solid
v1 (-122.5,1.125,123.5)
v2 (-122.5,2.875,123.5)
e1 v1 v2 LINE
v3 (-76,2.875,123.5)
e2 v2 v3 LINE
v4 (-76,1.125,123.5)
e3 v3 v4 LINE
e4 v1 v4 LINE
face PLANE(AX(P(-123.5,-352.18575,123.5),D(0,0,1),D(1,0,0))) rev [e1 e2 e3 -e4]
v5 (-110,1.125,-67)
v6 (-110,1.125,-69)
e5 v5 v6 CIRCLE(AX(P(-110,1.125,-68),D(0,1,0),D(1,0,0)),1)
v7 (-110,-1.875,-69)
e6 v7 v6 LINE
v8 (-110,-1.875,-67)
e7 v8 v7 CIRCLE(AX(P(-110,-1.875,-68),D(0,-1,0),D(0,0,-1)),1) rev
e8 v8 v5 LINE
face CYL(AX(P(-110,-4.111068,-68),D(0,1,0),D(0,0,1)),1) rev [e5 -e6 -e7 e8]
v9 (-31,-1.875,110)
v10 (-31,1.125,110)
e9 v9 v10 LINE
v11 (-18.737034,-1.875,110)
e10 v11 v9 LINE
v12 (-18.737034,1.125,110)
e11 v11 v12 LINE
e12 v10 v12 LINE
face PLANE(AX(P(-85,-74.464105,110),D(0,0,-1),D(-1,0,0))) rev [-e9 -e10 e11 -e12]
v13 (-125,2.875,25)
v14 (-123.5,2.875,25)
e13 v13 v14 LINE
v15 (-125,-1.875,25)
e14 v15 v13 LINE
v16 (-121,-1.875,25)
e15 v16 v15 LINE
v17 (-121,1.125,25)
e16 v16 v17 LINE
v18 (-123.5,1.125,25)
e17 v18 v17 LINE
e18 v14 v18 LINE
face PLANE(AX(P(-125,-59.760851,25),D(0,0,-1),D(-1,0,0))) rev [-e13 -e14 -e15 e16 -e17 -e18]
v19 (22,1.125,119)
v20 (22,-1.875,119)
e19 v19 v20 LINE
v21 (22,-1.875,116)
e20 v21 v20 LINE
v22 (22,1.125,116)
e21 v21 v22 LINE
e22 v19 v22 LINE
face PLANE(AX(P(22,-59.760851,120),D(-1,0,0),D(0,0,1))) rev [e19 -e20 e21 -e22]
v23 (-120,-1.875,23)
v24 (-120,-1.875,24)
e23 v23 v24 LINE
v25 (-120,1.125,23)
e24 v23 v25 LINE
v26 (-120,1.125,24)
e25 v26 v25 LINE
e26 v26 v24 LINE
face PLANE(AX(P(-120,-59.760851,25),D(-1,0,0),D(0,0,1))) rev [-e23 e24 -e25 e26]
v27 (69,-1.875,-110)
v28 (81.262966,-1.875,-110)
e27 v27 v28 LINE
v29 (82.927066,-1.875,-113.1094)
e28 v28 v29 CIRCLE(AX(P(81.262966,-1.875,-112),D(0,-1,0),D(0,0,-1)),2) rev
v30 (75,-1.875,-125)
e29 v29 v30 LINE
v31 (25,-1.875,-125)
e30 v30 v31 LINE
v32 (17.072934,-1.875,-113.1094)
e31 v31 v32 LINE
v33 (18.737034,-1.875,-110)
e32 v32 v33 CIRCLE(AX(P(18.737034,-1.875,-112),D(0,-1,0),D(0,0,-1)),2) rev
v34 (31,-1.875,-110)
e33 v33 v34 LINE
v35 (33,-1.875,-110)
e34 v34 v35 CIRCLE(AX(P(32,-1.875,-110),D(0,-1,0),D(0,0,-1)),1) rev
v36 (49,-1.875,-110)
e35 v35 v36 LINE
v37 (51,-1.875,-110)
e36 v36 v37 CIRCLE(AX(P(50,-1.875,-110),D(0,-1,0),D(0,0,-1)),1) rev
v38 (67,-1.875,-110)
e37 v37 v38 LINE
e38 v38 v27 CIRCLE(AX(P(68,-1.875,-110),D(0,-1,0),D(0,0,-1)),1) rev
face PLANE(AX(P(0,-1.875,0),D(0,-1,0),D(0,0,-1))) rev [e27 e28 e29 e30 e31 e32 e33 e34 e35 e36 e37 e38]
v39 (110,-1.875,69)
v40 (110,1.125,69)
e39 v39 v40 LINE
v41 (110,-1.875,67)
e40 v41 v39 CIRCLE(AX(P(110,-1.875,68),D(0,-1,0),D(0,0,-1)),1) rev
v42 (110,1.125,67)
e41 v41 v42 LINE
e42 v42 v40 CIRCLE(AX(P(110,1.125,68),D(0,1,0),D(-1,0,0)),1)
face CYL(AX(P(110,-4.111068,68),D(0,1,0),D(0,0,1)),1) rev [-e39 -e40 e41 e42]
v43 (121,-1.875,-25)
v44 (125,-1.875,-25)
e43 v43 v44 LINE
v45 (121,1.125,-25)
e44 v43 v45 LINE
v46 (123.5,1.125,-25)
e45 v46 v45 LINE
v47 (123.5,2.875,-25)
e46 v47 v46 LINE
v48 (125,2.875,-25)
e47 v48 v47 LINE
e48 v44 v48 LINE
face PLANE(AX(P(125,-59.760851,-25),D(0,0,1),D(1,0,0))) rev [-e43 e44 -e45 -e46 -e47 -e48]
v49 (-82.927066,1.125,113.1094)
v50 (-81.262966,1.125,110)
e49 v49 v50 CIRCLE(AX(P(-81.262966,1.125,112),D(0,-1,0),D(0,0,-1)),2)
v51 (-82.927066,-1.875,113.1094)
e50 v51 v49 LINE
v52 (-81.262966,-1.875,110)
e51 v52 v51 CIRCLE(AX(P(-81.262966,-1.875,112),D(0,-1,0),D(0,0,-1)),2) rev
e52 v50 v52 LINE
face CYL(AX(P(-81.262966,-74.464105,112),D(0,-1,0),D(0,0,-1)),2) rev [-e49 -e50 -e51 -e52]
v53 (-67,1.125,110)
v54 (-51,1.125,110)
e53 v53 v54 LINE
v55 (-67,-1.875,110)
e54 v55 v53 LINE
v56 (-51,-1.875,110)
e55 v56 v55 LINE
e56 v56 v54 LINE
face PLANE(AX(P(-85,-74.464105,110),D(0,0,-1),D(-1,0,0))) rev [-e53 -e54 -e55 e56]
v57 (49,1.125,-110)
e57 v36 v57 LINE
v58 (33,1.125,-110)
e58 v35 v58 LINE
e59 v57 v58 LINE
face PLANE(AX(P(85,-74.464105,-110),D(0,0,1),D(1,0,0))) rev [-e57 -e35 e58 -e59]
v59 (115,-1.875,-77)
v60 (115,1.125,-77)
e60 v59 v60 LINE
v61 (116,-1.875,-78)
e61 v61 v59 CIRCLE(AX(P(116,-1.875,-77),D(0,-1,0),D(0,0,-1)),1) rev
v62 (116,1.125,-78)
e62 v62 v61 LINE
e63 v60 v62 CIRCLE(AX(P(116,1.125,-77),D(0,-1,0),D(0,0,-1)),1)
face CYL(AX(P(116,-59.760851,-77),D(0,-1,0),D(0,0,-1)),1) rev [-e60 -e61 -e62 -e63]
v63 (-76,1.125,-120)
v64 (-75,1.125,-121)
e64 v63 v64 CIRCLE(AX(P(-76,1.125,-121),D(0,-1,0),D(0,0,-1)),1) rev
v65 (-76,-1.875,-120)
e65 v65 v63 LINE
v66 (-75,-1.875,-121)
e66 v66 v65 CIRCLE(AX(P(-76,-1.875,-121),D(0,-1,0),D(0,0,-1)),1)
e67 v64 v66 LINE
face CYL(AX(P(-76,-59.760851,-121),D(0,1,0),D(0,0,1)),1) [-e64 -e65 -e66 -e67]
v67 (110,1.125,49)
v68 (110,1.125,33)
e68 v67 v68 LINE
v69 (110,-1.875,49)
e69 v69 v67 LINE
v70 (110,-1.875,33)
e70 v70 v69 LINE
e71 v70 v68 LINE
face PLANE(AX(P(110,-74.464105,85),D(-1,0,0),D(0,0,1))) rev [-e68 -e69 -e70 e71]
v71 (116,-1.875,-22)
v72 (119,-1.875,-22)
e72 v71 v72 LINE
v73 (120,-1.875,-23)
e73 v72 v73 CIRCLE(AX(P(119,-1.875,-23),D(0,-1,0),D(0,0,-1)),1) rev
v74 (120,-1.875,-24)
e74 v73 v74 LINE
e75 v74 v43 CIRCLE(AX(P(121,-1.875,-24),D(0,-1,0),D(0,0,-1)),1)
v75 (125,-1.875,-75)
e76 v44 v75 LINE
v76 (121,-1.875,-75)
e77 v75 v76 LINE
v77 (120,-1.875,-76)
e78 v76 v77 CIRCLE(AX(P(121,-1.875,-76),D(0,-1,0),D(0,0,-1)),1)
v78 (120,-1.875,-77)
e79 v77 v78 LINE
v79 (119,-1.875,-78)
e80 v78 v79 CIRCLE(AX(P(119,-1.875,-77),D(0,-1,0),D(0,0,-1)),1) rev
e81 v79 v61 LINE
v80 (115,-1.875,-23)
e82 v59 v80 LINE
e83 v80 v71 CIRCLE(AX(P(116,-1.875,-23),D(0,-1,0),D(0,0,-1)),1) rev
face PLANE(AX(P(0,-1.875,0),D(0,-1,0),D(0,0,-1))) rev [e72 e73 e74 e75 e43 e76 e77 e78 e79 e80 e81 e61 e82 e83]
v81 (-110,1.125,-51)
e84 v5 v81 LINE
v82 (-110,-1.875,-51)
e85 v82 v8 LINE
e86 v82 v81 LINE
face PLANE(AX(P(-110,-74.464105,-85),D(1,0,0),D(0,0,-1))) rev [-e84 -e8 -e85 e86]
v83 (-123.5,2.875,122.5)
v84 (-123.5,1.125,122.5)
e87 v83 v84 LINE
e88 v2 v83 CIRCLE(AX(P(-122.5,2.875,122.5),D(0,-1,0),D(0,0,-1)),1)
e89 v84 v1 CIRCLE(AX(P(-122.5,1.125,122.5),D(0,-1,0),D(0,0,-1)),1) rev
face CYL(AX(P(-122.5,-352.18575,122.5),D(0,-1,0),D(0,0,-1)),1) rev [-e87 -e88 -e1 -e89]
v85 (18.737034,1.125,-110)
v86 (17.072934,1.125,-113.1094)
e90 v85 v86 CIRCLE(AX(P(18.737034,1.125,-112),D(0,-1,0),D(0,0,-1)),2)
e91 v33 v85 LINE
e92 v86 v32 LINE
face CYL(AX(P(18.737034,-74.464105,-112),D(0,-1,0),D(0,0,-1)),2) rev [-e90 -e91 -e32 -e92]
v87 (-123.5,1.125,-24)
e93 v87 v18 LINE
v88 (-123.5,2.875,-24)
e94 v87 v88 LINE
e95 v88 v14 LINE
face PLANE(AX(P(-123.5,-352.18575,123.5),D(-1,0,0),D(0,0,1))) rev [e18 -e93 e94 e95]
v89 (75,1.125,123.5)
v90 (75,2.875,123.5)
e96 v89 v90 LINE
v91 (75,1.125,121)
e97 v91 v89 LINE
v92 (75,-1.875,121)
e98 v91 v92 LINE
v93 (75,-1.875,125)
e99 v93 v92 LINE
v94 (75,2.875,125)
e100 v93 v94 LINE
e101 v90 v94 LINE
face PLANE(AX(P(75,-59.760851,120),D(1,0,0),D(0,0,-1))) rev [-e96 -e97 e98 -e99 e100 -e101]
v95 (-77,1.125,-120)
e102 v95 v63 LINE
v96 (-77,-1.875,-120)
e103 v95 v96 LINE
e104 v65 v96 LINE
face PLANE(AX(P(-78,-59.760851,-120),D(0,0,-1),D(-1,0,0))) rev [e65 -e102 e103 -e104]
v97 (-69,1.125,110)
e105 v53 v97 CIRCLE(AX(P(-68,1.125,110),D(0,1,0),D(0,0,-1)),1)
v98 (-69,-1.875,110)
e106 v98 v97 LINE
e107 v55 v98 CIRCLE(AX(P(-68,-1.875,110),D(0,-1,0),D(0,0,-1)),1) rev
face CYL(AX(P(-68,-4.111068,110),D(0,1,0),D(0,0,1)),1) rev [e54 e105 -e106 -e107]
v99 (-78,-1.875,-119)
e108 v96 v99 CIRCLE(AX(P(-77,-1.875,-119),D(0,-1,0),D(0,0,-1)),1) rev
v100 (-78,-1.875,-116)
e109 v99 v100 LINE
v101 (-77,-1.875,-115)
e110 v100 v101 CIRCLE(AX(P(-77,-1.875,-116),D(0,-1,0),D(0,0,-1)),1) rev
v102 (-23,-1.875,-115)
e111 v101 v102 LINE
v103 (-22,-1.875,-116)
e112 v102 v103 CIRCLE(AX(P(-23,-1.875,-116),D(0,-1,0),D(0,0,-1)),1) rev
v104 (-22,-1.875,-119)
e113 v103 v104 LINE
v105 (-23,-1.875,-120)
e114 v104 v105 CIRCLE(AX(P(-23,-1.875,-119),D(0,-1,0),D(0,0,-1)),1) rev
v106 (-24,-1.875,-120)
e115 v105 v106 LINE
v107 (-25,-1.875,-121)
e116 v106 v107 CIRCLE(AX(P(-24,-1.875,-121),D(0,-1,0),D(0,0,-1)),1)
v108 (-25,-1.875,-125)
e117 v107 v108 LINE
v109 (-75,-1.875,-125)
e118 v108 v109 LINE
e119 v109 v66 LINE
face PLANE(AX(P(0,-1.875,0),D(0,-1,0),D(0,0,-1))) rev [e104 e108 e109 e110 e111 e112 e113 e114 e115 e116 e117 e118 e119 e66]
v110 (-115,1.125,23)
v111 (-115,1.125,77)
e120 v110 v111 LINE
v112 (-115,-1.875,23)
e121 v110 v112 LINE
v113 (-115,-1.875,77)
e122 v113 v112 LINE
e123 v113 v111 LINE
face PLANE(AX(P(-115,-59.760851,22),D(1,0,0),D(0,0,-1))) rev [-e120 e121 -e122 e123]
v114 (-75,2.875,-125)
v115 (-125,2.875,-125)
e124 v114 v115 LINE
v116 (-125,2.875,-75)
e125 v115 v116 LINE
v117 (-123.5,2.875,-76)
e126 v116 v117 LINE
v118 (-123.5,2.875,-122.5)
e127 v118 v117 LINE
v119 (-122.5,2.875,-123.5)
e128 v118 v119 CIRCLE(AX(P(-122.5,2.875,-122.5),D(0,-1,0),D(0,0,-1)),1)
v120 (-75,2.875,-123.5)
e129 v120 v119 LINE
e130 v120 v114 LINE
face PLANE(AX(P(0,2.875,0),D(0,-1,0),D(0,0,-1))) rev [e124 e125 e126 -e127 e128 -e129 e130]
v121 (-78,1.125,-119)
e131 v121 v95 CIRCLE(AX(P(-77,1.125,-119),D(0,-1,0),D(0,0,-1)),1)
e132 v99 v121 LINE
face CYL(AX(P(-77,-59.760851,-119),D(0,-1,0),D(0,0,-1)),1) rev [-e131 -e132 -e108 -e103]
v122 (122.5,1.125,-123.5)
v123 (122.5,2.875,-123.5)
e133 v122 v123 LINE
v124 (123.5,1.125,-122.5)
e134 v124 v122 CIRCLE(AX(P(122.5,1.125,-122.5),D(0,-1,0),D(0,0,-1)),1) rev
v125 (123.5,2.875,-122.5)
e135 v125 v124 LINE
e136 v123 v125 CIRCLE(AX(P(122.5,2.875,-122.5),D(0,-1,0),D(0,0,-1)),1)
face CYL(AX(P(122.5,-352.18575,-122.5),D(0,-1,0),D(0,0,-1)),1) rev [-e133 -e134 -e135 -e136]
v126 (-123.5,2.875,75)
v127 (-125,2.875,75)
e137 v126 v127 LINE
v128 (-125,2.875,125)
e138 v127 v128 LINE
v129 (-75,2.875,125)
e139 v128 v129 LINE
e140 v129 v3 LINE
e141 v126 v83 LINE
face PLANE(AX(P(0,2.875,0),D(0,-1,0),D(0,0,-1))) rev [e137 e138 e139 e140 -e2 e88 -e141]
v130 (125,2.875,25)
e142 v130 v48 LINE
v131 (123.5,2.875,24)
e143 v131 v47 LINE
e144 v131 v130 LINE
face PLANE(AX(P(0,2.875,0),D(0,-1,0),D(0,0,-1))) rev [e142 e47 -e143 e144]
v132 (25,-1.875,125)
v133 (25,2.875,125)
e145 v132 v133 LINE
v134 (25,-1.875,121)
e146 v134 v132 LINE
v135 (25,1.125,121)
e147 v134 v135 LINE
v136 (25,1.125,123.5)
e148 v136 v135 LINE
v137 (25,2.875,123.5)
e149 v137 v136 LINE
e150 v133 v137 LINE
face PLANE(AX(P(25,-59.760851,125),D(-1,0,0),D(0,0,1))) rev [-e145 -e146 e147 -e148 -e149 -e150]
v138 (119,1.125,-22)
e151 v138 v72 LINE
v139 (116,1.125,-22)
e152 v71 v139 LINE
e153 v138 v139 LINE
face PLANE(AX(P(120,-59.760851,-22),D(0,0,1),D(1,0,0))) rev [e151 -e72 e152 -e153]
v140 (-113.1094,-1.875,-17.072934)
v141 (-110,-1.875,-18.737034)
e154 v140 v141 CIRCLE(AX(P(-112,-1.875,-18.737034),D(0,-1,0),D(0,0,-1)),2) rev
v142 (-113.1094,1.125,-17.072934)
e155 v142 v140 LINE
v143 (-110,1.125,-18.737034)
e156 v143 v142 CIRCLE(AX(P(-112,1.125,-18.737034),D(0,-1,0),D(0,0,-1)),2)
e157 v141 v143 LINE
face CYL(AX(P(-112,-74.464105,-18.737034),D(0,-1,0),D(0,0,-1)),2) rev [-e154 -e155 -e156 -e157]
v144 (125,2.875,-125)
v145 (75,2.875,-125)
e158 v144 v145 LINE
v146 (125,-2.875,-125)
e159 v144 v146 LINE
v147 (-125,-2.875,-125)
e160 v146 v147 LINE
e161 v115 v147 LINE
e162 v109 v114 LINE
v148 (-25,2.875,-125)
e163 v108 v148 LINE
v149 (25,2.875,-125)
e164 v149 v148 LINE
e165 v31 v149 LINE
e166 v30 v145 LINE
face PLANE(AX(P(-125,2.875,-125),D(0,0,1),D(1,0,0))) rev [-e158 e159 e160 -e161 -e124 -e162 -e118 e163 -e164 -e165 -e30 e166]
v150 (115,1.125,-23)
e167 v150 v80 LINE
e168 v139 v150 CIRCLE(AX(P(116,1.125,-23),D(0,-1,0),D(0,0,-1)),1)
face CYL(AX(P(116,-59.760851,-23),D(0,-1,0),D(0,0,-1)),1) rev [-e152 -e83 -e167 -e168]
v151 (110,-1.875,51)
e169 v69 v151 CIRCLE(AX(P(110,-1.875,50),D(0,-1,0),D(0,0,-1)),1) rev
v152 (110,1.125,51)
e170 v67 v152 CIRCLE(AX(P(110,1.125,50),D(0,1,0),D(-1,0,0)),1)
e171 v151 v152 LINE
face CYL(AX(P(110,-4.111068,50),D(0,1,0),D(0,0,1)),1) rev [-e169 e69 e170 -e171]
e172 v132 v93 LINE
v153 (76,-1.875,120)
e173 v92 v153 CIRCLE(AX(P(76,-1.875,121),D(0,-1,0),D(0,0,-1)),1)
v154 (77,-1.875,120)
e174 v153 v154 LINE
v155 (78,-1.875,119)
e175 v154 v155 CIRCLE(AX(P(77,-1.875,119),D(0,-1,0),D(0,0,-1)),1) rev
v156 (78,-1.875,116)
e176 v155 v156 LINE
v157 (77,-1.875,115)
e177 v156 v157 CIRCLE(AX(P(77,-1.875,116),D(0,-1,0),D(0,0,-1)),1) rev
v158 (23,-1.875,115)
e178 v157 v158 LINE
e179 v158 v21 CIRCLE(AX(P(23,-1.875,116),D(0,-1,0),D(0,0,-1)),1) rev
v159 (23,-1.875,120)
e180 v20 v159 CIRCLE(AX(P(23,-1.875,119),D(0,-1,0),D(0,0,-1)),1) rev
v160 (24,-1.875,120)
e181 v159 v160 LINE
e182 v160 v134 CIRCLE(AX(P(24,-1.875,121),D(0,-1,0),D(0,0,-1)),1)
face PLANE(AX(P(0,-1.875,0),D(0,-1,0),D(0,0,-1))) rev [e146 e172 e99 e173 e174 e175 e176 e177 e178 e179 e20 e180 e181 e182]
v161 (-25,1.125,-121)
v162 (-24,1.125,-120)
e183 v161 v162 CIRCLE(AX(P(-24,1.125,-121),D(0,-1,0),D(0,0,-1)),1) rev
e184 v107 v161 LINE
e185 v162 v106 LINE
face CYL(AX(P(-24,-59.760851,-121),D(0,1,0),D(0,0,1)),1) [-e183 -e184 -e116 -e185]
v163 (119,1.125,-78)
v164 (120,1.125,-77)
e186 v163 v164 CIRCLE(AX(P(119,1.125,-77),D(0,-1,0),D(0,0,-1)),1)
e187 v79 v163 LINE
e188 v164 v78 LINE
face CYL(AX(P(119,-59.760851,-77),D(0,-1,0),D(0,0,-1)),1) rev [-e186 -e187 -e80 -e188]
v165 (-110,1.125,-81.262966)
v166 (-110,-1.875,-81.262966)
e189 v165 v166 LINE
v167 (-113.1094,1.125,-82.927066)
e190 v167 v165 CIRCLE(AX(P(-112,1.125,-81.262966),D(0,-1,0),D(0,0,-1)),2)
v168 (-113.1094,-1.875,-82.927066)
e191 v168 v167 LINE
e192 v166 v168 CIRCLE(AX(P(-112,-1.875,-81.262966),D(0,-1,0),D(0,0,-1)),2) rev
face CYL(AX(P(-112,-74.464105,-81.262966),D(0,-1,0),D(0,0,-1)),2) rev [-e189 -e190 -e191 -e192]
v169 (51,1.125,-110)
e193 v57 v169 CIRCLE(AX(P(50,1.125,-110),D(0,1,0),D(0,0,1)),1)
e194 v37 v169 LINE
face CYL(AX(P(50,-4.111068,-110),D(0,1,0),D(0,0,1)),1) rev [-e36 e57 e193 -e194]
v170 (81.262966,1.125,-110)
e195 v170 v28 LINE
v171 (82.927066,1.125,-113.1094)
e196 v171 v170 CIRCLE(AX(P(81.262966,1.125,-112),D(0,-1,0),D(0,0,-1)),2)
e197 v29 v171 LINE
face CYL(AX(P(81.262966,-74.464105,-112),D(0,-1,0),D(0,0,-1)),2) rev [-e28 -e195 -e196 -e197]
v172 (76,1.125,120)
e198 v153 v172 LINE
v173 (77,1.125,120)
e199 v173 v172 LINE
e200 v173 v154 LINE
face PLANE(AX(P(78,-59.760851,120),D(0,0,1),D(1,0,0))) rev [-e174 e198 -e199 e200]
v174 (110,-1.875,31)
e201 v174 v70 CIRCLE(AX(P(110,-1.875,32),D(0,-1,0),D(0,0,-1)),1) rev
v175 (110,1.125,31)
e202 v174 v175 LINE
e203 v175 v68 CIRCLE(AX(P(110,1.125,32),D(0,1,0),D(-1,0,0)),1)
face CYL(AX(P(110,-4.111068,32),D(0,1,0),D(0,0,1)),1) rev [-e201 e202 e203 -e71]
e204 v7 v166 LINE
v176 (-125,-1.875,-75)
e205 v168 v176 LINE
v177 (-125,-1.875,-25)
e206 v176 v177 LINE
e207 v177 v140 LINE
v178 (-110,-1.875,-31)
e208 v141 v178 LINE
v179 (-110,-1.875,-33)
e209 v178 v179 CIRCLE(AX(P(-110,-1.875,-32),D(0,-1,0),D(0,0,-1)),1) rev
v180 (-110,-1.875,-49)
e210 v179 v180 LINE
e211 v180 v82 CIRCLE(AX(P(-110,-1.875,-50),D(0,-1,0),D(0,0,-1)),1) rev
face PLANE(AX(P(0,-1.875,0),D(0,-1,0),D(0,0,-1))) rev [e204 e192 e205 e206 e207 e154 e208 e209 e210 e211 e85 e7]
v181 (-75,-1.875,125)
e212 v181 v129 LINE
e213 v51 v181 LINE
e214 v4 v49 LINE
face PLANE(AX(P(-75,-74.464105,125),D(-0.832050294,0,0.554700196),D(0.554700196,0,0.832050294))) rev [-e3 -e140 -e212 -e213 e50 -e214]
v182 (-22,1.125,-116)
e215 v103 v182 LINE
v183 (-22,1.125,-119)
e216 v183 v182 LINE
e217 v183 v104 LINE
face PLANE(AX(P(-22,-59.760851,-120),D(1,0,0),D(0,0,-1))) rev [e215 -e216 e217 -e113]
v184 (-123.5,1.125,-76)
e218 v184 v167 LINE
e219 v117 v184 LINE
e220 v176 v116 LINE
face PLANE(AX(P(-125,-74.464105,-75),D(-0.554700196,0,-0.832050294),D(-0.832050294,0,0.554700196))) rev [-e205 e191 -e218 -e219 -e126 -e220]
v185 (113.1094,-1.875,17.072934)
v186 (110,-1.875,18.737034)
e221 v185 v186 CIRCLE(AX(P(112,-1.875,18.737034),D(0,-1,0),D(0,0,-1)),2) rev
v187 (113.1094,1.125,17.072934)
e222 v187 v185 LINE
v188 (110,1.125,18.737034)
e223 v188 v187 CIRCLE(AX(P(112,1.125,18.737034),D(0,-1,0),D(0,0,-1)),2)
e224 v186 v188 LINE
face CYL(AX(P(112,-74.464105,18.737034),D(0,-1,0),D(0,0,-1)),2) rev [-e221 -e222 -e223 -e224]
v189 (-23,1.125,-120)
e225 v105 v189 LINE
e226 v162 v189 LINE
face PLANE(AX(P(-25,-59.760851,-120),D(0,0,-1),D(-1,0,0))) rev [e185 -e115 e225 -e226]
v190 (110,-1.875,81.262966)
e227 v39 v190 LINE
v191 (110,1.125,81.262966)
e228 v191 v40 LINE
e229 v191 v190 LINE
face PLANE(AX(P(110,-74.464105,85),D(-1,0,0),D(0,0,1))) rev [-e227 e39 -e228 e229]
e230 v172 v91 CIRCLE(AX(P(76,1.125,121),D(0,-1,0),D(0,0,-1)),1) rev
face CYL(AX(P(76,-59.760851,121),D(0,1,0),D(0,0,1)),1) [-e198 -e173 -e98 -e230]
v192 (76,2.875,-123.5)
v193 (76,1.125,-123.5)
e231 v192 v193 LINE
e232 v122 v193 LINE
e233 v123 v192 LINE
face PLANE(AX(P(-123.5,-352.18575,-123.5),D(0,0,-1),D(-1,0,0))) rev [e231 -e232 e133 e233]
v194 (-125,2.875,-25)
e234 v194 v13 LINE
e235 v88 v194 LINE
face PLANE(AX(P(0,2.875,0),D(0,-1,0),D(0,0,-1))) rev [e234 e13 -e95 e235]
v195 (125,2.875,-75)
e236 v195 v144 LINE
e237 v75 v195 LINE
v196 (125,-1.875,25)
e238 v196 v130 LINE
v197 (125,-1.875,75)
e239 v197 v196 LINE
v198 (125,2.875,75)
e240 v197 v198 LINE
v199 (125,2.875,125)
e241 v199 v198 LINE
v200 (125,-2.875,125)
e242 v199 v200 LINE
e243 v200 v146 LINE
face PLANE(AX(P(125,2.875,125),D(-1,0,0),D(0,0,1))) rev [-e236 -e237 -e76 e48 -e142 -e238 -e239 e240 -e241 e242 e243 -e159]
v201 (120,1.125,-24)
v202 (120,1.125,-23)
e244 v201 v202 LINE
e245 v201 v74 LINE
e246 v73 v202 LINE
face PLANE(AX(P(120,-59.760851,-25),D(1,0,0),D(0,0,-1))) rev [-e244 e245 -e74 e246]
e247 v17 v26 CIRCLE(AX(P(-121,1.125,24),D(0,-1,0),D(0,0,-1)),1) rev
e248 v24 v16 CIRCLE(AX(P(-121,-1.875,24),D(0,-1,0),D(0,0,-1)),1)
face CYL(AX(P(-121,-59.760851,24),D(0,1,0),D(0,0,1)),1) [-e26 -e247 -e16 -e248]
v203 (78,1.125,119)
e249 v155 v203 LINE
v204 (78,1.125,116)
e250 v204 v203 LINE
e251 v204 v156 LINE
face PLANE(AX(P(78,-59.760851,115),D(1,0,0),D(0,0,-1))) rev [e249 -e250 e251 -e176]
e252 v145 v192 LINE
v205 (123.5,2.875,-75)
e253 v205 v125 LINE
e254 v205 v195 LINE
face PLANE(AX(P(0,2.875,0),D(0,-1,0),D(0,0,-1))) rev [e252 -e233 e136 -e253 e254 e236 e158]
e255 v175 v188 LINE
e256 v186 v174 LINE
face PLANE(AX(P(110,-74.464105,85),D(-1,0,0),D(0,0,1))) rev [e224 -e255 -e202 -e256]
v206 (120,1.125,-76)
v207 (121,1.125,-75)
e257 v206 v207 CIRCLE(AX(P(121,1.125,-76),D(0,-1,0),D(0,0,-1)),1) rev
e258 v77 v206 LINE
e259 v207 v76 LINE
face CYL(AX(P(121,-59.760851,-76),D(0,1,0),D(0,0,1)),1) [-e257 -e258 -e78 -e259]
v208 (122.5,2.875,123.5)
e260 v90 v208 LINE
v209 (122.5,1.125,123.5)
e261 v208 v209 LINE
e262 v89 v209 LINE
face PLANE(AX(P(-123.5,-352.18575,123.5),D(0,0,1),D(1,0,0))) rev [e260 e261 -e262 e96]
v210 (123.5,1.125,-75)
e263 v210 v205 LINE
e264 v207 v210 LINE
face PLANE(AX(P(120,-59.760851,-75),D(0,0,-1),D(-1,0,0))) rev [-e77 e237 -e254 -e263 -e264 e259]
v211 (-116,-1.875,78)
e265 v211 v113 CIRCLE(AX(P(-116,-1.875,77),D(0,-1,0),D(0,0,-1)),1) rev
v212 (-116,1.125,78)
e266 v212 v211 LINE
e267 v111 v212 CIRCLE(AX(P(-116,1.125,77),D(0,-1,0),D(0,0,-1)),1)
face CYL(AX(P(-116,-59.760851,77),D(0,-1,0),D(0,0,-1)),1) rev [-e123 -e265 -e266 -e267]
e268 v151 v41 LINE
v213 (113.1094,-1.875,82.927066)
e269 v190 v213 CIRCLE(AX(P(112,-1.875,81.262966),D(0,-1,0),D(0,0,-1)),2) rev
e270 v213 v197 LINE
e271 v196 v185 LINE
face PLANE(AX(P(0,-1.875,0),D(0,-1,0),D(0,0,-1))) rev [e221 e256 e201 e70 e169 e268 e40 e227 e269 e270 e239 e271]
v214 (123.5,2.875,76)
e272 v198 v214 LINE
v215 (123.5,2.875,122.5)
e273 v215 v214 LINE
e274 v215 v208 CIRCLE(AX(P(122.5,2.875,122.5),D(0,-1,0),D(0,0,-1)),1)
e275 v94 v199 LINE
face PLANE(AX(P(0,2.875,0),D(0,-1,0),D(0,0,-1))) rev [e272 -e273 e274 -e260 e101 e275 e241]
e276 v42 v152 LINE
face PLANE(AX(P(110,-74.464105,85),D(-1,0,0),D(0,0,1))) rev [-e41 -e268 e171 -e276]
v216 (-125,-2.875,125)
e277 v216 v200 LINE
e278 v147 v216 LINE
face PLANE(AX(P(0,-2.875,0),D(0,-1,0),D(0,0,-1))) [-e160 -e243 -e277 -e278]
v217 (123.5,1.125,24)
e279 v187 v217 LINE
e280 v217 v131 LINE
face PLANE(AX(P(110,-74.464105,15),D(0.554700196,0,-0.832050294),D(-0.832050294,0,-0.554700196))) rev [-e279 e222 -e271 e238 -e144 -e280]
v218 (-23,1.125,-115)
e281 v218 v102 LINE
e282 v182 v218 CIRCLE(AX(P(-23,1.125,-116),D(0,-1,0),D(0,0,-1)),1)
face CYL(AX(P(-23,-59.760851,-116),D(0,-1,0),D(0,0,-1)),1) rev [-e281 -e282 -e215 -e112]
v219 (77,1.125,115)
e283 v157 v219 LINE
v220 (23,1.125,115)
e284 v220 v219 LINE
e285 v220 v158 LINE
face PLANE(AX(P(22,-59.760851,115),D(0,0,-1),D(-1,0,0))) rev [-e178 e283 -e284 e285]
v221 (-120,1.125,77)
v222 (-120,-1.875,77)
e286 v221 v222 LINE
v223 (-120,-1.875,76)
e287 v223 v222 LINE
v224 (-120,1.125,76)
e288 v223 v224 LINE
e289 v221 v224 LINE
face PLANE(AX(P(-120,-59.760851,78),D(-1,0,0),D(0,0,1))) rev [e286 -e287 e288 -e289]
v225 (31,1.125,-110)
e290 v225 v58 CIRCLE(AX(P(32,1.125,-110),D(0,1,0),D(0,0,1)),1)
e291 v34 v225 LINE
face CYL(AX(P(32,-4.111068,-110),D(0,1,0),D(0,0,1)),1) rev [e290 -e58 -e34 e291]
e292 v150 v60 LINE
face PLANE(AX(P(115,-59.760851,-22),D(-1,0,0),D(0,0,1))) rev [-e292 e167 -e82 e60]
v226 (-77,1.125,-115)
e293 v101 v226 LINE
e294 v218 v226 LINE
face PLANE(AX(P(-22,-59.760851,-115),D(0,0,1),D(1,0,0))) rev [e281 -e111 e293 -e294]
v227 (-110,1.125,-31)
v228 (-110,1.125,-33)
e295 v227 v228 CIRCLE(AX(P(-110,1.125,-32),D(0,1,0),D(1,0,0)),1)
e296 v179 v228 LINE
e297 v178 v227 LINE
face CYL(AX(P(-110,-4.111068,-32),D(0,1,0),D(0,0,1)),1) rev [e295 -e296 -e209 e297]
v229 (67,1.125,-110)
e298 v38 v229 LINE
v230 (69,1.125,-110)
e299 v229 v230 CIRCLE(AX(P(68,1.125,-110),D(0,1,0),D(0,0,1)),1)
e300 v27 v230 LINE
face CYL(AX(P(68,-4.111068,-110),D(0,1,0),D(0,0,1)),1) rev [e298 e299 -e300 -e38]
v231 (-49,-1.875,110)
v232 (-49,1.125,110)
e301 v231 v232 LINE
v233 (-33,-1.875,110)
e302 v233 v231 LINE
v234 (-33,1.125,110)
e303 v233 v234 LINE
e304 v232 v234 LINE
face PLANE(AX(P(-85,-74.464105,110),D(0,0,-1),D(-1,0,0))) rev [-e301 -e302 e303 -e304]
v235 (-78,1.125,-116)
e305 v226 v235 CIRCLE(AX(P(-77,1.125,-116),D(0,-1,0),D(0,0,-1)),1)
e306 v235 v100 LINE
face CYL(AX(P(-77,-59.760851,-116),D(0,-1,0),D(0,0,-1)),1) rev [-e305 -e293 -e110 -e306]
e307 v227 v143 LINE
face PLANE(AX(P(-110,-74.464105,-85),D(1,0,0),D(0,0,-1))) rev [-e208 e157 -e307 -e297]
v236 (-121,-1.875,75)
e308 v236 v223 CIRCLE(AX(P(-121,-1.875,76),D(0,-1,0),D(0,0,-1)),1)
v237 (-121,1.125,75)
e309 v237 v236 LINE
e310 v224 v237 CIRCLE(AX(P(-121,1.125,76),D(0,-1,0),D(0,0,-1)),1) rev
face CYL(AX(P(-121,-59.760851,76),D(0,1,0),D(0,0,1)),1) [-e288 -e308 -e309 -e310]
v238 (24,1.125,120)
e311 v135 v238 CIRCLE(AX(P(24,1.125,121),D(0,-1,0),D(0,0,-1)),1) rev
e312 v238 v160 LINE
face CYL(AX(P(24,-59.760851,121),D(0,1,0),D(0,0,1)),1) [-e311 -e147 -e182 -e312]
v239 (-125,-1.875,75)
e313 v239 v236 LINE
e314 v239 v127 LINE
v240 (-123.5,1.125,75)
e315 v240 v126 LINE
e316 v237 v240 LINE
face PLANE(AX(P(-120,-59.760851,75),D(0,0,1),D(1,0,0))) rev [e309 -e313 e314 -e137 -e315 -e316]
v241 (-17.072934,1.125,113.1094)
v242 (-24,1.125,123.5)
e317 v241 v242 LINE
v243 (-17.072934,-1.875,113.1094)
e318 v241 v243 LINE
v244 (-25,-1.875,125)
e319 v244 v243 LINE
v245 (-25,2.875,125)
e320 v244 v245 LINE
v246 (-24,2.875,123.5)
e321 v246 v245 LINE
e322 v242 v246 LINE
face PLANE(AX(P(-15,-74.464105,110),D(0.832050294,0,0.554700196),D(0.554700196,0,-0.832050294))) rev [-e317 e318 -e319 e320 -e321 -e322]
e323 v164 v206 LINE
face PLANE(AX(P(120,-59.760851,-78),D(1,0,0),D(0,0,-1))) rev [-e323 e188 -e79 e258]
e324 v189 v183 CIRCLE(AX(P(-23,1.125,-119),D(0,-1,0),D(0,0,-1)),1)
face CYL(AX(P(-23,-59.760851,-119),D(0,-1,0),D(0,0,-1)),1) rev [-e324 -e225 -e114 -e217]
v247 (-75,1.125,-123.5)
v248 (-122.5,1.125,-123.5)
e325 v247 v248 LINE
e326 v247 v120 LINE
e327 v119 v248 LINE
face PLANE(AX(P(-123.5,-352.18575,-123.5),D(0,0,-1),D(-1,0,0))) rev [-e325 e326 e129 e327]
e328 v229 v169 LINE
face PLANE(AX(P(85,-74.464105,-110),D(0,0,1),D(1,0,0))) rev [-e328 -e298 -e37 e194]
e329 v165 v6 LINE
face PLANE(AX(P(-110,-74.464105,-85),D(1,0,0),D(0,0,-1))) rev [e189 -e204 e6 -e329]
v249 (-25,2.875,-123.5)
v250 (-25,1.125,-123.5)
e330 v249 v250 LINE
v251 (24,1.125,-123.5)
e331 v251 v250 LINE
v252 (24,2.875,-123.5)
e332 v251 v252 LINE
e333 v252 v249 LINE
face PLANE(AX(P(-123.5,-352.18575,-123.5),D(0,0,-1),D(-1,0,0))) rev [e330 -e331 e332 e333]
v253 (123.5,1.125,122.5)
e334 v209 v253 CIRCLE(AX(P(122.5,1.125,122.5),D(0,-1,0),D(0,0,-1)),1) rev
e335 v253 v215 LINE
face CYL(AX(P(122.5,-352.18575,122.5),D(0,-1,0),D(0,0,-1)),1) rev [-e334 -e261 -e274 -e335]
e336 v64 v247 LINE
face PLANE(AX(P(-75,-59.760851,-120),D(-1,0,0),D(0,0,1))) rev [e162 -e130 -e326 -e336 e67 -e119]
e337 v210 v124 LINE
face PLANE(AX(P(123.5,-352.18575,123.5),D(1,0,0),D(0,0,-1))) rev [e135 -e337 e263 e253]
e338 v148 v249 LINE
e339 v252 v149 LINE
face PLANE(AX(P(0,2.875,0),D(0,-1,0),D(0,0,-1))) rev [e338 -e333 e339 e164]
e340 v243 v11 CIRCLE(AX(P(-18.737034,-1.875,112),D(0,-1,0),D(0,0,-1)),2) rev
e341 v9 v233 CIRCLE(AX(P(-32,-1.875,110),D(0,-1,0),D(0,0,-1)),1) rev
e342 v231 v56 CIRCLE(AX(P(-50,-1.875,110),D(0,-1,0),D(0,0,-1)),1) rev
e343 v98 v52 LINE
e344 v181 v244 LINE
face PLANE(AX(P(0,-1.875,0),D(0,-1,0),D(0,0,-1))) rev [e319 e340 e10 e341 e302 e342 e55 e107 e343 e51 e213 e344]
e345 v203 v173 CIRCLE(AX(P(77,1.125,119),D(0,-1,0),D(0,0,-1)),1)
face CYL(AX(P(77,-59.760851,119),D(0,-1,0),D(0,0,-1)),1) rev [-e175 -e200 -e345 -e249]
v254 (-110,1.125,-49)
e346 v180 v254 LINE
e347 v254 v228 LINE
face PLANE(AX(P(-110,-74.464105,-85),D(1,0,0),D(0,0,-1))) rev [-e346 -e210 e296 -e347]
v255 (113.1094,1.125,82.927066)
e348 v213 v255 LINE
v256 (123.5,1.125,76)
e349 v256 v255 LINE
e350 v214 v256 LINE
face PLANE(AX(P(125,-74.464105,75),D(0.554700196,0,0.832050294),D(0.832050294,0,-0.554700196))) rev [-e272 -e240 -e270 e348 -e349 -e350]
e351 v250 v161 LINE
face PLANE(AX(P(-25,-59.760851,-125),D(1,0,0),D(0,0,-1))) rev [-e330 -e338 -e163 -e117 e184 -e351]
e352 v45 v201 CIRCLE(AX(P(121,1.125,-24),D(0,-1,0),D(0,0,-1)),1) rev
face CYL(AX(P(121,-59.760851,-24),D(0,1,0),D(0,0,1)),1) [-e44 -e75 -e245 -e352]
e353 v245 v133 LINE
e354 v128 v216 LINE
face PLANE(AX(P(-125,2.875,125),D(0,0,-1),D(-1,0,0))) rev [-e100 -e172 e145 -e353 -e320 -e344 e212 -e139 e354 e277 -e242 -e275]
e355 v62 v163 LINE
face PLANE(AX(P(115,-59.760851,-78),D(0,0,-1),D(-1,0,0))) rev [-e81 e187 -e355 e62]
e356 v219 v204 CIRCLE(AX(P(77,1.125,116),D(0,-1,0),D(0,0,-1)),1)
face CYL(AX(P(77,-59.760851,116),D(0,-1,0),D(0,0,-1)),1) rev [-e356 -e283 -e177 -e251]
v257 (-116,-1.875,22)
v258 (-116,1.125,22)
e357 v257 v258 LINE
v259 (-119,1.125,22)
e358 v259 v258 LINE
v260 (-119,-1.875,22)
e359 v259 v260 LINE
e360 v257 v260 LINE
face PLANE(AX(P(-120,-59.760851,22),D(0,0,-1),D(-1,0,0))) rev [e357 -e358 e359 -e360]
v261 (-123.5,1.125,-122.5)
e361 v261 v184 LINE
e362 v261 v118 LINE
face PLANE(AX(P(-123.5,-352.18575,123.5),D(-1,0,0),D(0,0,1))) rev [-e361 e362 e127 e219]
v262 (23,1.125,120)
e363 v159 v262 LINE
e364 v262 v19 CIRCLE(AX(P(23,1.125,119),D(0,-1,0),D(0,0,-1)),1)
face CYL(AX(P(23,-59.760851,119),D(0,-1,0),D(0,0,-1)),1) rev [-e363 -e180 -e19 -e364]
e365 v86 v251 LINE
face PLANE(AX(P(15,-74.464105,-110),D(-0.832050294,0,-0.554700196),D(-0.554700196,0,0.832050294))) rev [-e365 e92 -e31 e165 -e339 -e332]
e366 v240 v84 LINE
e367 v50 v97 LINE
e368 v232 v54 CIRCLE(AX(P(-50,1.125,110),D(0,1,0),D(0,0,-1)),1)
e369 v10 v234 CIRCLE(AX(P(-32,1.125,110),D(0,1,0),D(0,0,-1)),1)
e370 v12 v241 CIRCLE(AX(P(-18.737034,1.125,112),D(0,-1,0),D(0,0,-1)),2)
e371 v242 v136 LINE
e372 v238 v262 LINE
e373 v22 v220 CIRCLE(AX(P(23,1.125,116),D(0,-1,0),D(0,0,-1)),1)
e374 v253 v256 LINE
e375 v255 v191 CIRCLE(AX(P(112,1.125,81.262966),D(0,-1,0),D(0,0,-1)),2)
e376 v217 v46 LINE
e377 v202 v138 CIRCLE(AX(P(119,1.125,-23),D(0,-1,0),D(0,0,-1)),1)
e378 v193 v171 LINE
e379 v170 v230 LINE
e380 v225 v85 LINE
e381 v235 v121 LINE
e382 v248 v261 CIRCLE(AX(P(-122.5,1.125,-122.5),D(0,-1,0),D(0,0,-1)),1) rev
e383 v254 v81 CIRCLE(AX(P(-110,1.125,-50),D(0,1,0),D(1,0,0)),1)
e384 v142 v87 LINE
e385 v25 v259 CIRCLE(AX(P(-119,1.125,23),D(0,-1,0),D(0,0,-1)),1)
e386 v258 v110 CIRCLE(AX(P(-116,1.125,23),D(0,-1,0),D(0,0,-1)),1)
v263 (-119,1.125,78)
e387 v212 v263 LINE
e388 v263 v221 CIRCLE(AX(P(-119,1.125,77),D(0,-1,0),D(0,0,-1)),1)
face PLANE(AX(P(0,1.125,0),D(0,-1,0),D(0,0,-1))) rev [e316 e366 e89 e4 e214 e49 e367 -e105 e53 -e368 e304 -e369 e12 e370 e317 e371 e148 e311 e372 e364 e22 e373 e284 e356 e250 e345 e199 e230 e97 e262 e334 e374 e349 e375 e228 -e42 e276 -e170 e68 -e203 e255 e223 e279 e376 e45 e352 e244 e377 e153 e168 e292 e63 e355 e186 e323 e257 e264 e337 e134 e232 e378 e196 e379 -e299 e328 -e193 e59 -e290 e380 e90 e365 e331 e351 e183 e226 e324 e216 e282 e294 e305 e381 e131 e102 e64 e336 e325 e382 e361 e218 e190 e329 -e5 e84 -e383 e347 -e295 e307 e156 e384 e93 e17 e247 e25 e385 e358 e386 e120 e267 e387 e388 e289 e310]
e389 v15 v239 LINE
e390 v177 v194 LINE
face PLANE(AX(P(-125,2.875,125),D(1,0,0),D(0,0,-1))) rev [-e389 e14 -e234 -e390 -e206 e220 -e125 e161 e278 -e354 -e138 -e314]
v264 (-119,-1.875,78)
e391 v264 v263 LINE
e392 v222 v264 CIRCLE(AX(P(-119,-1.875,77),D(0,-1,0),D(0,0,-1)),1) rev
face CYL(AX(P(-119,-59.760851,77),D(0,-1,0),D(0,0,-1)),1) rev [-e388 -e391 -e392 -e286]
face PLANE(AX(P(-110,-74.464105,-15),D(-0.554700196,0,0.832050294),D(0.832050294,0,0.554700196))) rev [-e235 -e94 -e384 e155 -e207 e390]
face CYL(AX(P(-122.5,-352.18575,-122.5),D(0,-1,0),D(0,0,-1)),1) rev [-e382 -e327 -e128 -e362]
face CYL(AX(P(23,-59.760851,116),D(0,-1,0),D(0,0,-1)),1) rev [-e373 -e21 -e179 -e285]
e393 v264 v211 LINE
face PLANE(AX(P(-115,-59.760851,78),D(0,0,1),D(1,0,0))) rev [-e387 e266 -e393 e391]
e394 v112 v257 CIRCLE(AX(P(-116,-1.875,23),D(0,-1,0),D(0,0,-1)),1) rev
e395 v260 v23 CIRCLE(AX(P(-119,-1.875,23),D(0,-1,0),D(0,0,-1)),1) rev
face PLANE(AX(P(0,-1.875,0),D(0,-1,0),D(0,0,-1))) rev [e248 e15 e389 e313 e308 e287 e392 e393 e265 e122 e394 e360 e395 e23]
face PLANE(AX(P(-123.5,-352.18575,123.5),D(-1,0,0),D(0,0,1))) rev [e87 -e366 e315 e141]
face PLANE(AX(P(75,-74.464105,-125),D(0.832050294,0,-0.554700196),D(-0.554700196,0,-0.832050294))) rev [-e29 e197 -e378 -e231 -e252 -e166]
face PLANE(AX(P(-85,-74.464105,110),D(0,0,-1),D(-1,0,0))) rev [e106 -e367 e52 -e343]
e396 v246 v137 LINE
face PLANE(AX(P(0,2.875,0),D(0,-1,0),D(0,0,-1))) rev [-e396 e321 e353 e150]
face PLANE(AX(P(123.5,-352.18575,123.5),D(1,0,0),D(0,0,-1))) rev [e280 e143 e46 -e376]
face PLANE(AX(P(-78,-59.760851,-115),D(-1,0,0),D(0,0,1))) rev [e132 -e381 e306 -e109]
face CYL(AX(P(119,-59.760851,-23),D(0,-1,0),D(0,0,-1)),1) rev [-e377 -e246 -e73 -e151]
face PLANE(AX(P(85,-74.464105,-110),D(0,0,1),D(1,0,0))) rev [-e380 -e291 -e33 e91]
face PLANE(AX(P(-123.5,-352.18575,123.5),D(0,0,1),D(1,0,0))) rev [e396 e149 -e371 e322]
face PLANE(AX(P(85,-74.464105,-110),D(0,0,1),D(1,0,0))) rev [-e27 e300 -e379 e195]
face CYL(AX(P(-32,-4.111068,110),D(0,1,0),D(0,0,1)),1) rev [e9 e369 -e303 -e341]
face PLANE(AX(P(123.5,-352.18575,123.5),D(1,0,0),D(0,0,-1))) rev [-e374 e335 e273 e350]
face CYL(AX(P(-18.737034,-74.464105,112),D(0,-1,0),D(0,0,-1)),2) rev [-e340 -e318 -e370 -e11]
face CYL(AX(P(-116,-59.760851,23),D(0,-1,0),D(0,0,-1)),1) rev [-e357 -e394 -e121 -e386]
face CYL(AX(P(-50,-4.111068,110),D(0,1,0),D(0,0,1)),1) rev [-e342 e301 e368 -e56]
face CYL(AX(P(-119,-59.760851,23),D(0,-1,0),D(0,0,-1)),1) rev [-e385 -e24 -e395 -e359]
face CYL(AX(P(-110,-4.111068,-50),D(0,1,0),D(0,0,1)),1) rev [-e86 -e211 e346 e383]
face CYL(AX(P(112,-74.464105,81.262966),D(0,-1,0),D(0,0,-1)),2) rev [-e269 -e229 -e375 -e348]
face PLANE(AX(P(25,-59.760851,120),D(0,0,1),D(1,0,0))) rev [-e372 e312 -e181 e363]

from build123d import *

# Parameters (mm, degrees)
SKETCH1_W           = 250
SKETCH1_H           = 250
BOSS_EXTRUDE1_DEPTH = 2.875
SKETCH2_W           = 247
SKETCH2_H           = 247
CUT_EXTRUDE1_DEPTH  = 1.75
CUT_EXTRUDE2_START  = -4.75
CUT_EXTRUDE2_DEPTH  = 182.620185447
CUT_EXTRUDE4_DEPTH  = 3
CUT_EXTRUDE3_START  = -4.75
CUT_EXTRUDE3_DEPTH  = 182.620185447
FILLET2_R           = 1
FILLET3_R           = 2
CIRPATTERN1_START   = -1.875
CIRPATTERN1_DEPTH   = 4.75


# Read off the part's stored shape, not the designer's step: CirPattern1
with BuildPart() as part:
    # Sketch1 → Boss-Extrude1 (new, symmetric)
    with BuildSketch(Plane(origin=(0, 0, 0), x_dir=(1, 0, 0), z_dir=(0, 1, 0))):
        Rectangle(SKETCH1_W, SKETCH1_H)
    extrude(amount=BOSS_EXTRUDE1_DEPTH, both=True)

    # Sketch2 → Cut-Extrude1 (cut)
    with BuildSketch(Plane(origin=(0, 2.875, 0), x_dir=(1, 0, 0), z_dir=(0, 1, 0))):
        Rectangle(SKETCH2_W, SKETCH2_H)
    extrude(amount=-CUT_EXTRUDE1_DEPTH, mode=Mode.SUBTRACT)

    # Sketch4 → Cut-Extrude2 (cut)
    with BuildSketch(Plane(origin=(0, 2.875, 0), x_dir=(1, 0, 0), z_dir=(0, 1, 0)).offset(CUT_EXTRUDE2_START)):
        Polygon((-75, -125), (-85, -110), (-15, -110), (-25, -125), align=None)
    extrude(amount=CUT_EXTRUDE2_DEPTH, mode=Mode.SUBTRACT)

    # Sketch6 → Cut-Extrude4 (cut)
    with BuildSketch(Plane(origin=(0, 1.125, 0), x_dir=(1, 0, 0), z_dir=(0, 1, 0))):
        with BuildLine():
            Line((-69, -110), (-67, -110))
            ThreePointArc((-67, -110), (-68, -109), (-69, -110))
        make_face()
        with BuildLine():
            Line((-51, -110), (-49, -110))
            ThreePointArc((-49, -110), (-50, -109), (-51, -110))
        make_face()
        with BuildLine():
            Line((-33, -110), (-31, -110))
            ThreePointArc((-31, -110), (-32, -109), (-33, -110))
        make_face()
    extrude(amount=-CUT_EXTRUDE4_DEPTH, mode=Mode.SUBTRACT)

    # Sketch5 → Cut-Extrude3 (cut)
    with BuildSketch(Plane(origin=(0, 2.875, 0), x_dir=(1, 0, 0), z_dir=(0, 1, 0)).offset(CUT_EXTRUDE3_START)):
        Polygon((25, -125), (25, -120), (22, -120), (22, -115), (78, -115), (78, -120), (75, -120), (75, -125), align=None)
    extrude(amount=CUT_EXTRUDE3_DEPTH, mode=Mode.SUBTRACT)

    # Fillet2
    fillet2_edges = [part.edges().sort_by_distance(p)[0] for p in [
        (-123.5, 2, -123.5),
        (-123.5, 2, 123.5),
        (123.5, 2, 123.5),
        (123.5, 2, -123.5),
        (75, -0.375, 120),
        (78, -0.375, 120),
        (78, -0.375, 115),
        (22, -0.375, 115),
        (22, -0.375, 120),
        (25, -0.375, 120),
    ]]
    fillet(fillet2_edges, radius=FILLET2_R)

    # Fillet3
    fillet3_edges = [part.edges().sort_by_distance(p)[0] for p in [
        (-85, -0.375, 110),
        (-15, -0.375, 110),
    ]]
    fillet(fillet3_edges, radius=FILLET3_R)

    # CirPattern1 outline → CirPattern1 (cut)
    with BuildSketch(Plane(origin=(0, 0, 0), x_dir=(1, 0, 0), z_dir=(0, 1, 0)).offset(CIRPATTERN1_START)):
        with BuildLine():
            ThreePointArc((110, -31), (109, -32), (110, -33))
            Line((110, -33), (110, -49))
            ThreePointArc((110, -49), (109, -50), (110, -51))
            Line((110, -51), (110, -67))
            ThreePointArc((110, -67), (109, -68), (110, -69))
            Line((110, -69), (110, -81.262965816))
            ThreePointArc((110, -81.262965816), (111.056284149, -83.026315014), (113.109400392, -82.927066405))
            Line((113.109400392, -82.927066405), (125, -75))
            Line((125, -75), (125, -25))
            Line((125, -25), (113.109400392, -17.072933595))
            ThreePointArc((113.109400392, -17.072933595), (111.056284149, -16.973684986), (110, -18.737034184))
            Line((110, -18.737034184), (110, -31))
        make_face()
        with BuildLine():
            Line((-125, 75), (-125, 25))
            Line((-125, 25), (-113.109400392, 17.072933595))
            ThreePointArc((-113.109400392, 17.072933595), (-111.056284149, 16.973684986), (-110, 18.737034184))
            Line((-110, 18.737034184), (-110, 31))
            ThreePointArc((-110, 31), (-109, 32), (-110, 33))
            Line((-110, 33), (-110, 49))
            ThreePointArc((-110, 49), (-109, 50), (-110, 51))
            Line((-110, 51), (-110, 67))
            ThreePointArc((-110, 67), (-109, 68), (-110, 69))
            Line((-110, 69), (-110, 81.262965816))
            ThreePointArc((-110, 81.262965816), (-111.056284149, 83.026315014), (-113.109400392, 82.927066405))
            Line((-113.109400392, 82.927066405), (-125, 75))
        make_face()
        with BuildLine():
            Line((75, 125), (25, 125))
            Line((25, 125), (17.072933595, 113.109400392))
            ThreePointArc((17.072933595, 113.109400392), (16.973684986, 111.056284149), (18.737034184, 110))
            Line((18.737034184, 110), (31, 110))
            ThreePointArc((31, 110), (32, 109), (33, 110))
            Line((33, 110), (49, 110))
            ThreePointArc((49, 110), (50, 109), (51, 110))
            Line((51, 110), (67, 110))
            ThreePointArc((67, 110), (68, 109), (69, 110))
            Line((69, 110), (81.262965816, 110))
            ThreePointArc((81.262965816, 110), (83.026315014, 111.056284149), (82.927066405, 113.109400392))
            Line((82.927066405, 113.109400392), (75, 125))
        make_face()
        with BuildLine():
            Line((125, 75), (121, 75))
            ThreePointArc((121, 75), (120.292893219, 75.292893219), (120, 76))
            Line((120, 76), (120, 77))
            ThreePointArc((120, 77), (119.707106781, 77.707106781), (119, 78))
            Line((119, 78), (116, 78))
            ThreePointArc((116, 78), (115.292893219, 77.707106781), (115, 77))
            Line((115, 77), (115, 23))
            ThreePointArc((115, 23), (115.292893219, 22.292893219), (116, 22))
            Line((116, 22), (119, 22))
            ThreePointArc((119, 22), (119.707106781, 22.292893219), (120, 23))
            Line((120, 23), (120, 24))
            ThreePointArc((120, 24), (120.292893219, 24.707106781), (121, 25))
            Line((121, 25), (125, 25))
            Line((125, 25), (125, 75))
        make_face()
        with BuildLine():
            Line((-25, 125), (-75, 125))
            Line((-75, 125), (-75, 121))
            ThreePointArc((-75, 121), (-75.292893219, 120.292893219), (-76, 120))
            Line((-76, 120), (-77, 120))
            ThreePointArc((-77, 120), (-77.707106781, 119.707106781), (-78, 119))
            Line((-78, 119), (-78, 116))
            ThreePointArc((-78, 116), (-77.707106781, 115.292893219), (-77, 115))
            Line((-77, 115), (-23, 115))
            ThreePointArc((-23, 115), (-22.292893219, 115.292893219), (-22, 116))
            Line((-22, 116), (-22, 119))
            ThreePointArc((-22, 119), (-22.292893219, 119.707106781), (-23, 120))
            Line((-23, 120), (-24, 120))
            ThreePointArc((-24, 120), (-24.707106781, 120.292893219), (-25, 121))
            Line((-25, 121), (-25, 125))
        make_face()
        with BuildLine():
            Line((-125, -25), (-125, -75))
            Line((-125, -75), (-121, -75))
            ThreePointArc((-121, -75), (-120.292893219, -75.292893219), (-120, -76))
            Line((-120, -76), (-120, -77))
            ThreePointArc((-120, -77), (-119.707106781, -77.707106781), (-119, -78))
            Line((-119, -78), (-116, -78))
            ThreePointArc((-116, -78), (-115.292893219, -77.707106781), (-115, -77))
            Line((-115, -77), (-115, -23))
            ThreePointArc((-115, -23), (-115.292893219, -22.292893219), (-116, -22))
            Line((-116, -22), (-119, -22))
            ThreePointArc((-119, -22), (-119.707106781, -22.292893219), (-120, -23))
            Line((-120, -23), (-120, -24))
            ThreePointArc((-120, -24), (-120.292893219, -24.707106781), (-121, -25))
            Line((-121, -25), (-125, -25))
        make_face()
    extrude(amount=CIRPATTERN1_DEPTH, mode=Mode.SUBTRACT)


solid = part.part
